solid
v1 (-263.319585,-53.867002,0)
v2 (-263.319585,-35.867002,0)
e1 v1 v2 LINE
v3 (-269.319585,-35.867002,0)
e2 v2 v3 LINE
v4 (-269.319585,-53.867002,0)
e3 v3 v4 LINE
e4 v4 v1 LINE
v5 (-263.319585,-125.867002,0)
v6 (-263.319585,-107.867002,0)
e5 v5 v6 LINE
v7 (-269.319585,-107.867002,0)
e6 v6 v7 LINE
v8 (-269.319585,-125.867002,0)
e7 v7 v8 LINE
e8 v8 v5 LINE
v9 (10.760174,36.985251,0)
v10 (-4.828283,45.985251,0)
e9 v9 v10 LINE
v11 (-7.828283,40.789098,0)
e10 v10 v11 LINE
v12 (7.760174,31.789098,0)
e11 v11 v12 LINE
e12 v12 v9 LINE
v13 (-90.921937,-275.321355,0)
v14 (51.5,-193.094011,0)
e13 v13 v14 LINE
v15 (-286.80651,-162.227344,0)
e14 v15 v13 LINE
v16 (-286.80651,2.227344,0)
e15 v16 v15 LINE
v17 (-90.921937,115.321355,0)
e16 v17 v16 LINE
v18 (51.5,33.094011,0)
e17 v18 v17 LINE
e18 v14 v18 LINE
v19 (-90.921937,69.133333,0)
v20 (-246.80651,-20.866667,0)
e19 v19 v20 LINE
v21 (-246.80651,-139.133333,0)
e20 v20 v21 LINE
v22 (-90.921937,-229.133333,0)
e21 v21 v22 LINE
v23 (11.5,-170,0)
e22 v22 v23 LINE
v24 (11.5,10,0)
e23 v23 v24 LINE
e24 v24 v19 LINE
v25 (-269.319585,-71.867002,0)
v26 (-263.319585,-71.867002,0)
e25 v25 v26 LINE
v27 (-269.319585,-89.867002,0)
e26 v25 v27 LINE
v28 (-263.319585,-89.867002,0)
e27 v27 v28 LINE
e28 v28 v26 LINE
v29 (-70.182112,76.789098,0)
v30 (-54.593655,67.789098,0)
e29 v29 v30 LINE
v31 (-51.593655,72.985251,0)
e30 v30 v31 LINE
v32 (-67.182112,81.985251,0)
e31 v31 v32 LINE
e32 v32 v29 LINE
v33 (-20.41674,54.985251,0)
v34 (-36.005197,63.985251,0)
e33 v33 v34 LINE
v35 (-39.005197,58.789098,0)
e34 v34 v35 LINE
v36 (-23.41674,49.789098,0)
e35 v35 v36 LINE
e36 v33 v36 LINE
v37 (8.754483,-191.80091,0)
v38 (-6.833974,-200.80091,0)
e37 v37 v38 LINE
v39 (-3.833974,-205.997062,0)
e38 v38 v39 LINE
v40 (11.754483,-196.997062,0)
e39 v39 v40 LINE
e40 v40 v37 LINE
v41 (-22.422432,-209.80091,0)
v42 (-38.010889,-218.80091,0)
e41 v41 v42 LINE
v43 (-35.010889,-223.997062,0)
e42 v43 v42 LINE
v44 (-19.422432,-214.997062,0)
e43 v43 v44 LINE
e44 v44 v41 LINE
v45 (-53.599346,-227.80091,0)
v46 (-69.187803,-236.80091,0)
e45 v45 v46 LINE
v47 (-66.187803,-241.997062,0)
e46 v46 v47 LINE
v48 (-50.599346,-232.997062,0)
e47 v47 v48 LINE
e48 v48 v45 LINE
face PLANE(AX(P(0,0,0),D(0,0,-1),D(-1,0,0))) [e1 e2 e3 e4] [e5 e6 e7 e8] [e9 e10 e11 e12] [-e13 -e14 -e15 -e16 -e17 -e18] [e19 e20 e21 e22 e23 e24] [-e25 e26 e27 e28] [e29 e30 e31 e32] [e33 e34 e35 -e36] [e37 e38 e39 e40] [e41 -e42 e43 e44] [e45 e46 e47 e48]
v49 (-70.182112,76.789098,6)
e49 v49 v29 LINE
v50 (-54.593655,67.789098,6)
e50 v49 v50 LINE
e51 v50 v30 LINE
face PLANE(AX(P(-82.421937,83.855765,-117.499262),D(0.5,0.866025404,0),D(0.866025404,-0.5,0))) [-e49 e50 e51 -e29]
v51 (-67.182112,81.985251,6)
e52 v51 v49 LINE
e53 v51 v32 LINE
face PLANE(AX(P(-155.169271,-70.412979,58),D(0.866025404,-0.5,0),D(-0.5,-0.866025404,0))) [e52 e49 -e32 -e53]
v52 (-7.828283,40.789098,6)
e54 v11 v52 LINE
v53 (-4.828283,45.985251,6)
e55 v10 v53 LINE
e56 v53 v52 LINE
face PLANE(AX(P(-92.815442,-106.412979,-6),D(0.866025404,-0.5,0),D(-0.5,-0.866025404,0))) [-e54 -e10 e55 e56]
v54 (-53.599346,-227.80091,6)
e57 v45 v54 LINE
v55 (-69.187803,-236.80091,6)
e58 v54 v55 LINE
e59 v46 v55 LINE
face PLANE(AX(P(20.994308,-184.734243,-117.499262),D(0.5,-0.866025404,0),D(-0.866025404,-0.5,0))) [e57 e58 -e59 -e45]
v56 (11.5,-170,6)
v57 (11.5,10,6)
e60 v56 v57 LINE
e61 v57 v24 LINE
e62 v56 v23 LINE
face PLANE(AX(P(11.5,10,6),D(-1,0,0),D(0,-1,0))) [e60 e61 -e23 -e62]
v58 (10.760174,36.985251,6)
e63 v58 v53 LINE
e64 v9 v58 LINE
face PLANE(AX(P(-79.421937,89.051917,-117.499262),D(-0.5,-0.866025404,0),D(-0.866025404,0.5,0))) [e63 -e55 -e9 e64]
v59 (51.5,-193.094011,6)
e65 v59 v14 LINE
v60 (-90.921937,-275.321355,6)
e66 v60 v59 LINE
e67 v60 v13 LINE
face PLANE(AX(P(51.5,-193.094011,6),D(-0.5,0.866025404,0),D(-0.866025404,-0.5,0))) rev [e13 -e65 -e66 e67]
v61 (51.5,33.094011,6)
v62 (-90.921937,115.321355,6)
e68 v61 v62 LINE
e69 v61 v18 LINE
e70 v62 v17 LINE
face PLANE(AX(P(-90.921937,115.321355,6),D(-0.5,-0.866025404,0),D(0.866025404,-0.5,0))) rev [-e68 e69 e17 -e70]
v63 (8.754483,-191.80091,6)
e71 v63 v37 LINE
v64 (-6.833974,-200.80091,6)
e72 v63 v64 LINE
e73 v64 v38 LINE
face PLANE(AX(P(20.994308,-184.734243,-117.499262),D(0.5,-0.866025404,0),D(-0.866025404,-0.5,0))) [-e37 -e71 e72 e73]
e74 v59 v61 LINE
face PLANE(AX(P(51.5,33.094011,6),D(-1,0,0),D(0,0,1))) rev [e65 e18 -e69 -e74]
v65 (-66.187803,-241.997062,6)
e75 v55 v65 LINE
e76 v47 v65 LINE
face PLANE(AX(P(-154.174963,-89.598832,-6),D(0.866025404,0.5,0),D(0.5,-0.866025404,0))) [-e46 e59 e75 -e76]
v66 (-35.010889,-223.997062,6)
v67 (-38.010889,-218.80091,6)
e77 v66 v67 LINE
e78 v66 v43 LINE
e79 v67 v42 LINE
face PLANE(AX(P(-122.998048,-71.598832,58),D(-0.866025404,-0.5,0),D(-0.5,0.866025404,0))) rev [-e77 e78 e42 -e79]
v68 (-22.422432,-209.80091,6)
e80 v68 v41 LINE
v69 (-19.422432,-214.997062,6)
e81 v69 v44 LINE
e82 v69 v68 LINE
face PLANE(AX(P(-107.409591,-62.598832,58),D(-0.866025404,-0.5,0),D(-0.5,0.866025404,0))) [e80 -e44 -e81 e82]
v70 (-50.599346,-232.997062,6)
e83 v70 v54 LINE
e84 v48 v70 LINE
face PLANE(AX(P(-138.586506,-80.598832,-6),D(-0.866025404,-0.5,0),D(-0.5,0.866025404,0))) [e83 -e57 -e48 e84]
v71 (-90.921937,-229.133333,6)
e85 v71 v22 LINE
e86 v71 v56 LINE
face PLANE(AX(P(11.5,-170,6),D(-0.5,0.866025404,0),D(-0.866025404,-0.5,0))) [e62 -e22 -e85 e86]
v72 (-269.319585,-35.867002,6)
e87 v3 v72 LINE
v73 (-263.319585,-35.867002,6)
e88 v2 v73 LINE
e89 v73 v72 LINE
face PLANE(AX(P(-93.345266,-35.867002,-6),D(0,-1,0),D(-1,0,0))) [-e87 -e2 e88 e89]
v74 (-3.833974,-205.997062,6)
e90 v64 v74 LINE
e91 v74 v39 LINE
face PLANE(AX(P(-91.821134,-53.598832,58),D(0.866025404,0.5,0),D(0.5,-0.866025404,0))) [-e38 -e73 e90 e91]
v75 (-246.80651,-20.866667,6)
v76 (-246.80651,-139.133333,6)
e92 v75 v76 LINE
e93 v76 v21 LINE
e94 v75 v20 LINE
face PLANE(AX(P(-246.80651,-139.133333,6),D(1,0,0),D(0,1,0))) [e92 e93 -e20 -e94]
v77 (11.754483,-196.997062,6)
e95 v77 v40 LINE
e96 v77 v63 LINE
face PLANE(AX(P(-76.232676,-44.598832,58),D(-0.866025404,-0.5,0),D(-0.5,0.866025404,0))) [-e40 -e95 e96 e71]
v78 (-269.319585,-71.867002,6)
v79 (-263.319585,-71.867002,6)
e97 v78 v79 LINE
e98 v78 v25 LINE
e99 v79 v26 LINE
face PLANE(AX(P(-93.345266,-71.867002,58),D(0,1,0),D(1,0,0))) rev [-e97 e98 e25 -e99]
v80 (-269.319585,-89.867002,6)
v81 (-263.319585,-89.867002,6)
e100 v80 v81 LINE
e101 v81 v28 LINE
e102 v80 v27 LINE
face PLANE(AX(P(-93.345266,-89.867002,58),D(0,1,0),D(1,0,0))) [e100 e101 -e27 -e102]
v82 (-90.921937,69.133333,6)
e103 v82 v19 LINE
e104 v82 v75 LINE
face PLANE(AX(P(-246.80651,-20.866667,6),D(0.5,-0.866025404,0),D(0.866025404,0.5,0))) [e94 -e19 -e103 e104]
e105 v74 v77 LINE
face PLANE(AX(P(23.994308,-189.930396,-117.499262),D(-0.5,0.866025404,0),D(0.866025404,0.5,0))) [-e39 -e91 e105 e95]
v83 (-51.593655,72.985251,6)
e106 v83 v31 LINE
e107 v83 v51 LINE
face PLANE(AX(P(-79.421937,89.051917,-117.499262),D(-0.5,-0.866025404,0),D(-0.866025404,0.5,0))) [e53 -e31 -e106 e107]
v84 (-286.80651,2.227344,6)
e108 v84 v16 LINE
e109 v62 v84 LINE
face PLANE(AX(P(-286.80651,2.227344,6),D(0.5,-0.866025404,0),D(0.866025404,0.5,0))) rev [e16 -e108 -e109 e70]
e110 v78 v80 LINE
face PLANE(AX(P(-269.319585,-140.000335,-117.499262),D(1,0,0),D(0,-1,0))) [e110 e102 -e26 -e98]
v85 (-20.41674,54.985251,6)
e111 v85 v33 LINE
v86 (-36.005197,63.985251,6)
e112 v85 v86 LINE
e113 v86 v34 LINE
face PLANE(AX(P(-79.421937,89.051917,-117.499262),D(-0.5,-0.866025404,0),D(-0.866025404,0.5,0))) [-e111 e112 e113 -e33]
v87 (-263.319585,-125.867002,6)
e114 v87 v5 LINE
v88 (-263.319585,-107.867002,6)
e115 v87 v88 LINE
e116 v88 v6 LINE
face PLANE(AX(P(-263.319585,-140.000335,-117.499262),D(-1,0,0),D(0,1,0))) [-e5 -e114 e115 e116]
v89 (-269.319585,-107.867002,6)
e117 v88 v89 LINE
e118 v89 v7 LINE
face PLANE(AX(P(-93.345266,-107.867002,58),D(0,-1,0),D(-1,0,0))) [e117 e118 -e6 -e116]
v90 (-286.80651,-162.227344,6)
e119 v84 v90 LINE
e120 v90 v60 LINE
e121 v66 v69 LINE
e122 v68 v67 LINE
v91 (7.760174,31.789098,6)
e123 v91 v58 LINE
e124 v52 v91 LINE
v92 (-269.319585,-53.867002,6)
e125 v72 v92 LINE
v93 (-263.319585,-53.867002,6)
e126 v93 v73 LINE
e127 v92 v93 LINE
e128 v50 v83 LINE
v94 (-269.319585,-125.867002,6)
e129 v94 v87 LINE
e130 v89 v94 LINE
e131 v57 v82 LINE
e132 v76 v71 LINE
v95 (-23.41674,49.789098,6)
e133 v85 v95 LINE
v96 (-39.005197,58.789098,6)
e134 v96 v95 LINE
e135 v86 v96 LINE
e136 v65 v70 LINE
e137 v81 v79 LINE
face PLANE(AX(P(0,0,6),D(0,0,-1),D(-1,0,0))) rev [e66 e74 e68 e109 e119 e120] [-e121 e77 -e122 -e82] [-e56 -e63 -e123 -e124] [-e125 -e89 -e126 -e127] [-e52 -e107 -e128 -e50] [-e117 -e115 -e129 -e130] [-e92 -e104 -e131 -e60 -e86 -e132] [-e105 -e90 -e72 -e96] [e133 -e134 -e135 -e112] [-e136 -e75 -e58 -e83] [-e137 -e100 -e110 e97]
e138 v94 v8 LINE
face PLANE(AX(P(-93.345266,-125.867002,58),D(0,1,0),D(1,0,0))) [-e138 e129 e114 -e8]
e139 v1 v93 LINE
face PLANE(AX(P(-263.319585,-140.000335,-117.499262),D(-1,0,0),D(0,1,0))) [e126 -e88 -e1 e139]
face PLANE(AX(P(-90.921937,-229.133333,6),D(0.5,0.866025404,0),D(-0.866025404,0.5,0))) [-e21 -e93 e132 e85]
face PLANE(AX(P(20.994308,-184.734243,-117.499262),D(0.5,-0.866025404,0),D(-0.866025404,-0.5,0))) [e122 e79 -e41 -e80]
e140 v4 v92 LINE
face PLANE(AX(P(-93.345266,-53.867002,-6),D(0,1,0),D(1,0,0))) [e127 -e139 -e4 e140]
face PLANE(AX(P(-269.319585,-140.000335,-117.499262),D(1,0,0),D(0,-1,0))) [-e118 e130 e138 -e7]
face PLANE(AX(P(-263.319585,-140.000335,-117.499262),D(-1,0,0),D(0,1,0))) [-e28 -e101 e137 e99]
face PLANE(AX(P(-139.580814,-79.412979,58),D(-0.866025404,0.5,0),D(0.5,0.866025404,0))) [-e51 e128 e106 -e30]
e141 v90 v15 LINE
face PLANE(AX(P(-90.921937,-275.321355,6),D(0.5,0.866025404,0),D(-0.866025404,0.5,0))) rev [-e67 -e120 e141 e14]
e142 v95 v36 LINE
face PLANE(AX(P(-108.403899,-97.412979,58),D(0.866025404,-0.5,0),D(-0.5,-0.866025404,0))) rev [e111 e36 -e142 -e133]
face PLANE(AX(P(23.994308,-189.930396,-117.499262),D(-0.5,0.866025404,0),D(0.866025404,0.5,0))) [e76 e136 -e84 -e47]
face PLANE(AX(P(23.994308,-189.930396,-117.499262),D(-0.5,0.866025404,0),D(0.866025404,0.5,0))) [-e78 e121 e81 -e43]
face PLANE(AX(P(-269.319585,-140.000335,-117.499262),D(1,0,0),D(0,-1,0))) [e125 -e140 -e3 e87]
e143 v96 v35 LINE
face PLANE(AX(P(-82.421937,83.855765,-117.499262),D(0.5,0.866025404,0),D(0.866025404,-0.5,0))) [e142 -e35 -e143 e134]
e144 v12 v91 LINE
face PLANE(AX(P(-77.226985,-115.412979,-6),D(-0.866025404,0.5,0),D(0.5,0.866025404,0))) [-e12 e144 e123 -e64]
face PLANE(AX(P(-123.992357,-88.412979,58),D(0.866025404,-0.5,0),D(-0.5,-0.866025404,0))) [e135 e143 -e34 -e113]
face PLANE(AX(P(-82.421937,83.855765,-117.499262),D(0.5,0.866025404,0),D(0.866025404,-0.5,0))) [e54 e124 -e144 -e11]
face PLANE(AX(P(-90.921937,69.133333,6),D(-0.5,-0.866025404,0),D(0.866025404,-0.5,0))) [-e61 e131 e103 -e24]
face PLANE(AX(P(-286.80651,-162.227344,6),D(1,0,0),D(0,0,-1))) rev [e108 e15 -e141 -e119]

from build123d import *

# Parameters (mm, degrees)
BOSS_EXTRU_1_DEPTH   = 6
EMPREINTE1_OUTLINE_W = 6
EMPREINTE1_OUTLINE_H = 18
EMPREINTE1_DEPTH     = 6


# Read off the part's stored shape, not the designer's step: Empreinte1
with BuildPart() as part:
    # Esquisse1 → Boss.-Extru.1 (new body)
    with BuildSketch(Plane.XY):
        Polygon((-286.806510123, 2.22734392), (-90.921937441, 115.321354688), (51.5, 33.094010768), (51.5, -193.094010768), (-90.921937441, -275.321354688), (-286.806510123, -162.22734392), align=None)
        Polygon((-246.806510123, -139.133333153), (-246.806510123, -20.866666847), (-90.921937441, 69.133333153), (11.5, 10), (11.5, -170), (-90.921937441, -229.133333153), align=None, mode=Mode.SUBTRACT)
    extrude(amount=BOSS_EXTRU_1_DEPTH)

    # Empreinte1 outline → Empreinte1 (cut)
    with BuildSketch(Plane.XY):
        Polygon((-6.833974392, -200.800909817), (-3.833974392, -205.99706224), (11.754482876, -196.99706224), (8.754482876, -191.800909817), align=None)
        Polygon((-22.42243166, -209.800909817), (-38.010888928, -218.800909817), (-35.010888928, -223.99706224), (-19.42243166, -214.99706224), align=None)
        Polygon((-53.599346196, -227.800909817), (-69.187803464, -236.800909817), (-66.187803464, -241.99706224), (-50.599346196, -232.99706224), align=None)
        with Locations((-266.319584862, -116.867002045)):
            Rectangle(EMPREINTE1_OUTLINE_W, EMPREINTE1_OUTLINE_H)
        with Locations((-266.319584862, -80.867002045)):
            Rectangle(EMPREINTE1_OUTLINE_W, EMPREINTE1_OUTLINE_H)
        with Locations((-266.319584862, -44.867002045)):
            Rectangle(EMPREINTE1_OUTLINE_W, EMPREINTE1_OUTLINE_H)
        Polygon((-54.593654623, 67.789098441), (-51.593654623, 72.985250863), (-67.182111891, 81.985250863), (-70.182111891, 76.789098441), align=None)
        Polygon((-39.005197355, 58.789098441), (-23.416740087, 49.789098441), (-20.416740087, 54.985250863), (-36.005197355, 63.985250863), align=None)
        Polygon((-7.828282819, 40.789098441), (7.76017445, 31.789098441), (10.76017445, 36.985250863), (-4.828282819, 45.985250863), align=None)
    extrude(amount=EMPREINTE1_DEPTH, mode=Mode.SUBTRACT)


solid = part.part
